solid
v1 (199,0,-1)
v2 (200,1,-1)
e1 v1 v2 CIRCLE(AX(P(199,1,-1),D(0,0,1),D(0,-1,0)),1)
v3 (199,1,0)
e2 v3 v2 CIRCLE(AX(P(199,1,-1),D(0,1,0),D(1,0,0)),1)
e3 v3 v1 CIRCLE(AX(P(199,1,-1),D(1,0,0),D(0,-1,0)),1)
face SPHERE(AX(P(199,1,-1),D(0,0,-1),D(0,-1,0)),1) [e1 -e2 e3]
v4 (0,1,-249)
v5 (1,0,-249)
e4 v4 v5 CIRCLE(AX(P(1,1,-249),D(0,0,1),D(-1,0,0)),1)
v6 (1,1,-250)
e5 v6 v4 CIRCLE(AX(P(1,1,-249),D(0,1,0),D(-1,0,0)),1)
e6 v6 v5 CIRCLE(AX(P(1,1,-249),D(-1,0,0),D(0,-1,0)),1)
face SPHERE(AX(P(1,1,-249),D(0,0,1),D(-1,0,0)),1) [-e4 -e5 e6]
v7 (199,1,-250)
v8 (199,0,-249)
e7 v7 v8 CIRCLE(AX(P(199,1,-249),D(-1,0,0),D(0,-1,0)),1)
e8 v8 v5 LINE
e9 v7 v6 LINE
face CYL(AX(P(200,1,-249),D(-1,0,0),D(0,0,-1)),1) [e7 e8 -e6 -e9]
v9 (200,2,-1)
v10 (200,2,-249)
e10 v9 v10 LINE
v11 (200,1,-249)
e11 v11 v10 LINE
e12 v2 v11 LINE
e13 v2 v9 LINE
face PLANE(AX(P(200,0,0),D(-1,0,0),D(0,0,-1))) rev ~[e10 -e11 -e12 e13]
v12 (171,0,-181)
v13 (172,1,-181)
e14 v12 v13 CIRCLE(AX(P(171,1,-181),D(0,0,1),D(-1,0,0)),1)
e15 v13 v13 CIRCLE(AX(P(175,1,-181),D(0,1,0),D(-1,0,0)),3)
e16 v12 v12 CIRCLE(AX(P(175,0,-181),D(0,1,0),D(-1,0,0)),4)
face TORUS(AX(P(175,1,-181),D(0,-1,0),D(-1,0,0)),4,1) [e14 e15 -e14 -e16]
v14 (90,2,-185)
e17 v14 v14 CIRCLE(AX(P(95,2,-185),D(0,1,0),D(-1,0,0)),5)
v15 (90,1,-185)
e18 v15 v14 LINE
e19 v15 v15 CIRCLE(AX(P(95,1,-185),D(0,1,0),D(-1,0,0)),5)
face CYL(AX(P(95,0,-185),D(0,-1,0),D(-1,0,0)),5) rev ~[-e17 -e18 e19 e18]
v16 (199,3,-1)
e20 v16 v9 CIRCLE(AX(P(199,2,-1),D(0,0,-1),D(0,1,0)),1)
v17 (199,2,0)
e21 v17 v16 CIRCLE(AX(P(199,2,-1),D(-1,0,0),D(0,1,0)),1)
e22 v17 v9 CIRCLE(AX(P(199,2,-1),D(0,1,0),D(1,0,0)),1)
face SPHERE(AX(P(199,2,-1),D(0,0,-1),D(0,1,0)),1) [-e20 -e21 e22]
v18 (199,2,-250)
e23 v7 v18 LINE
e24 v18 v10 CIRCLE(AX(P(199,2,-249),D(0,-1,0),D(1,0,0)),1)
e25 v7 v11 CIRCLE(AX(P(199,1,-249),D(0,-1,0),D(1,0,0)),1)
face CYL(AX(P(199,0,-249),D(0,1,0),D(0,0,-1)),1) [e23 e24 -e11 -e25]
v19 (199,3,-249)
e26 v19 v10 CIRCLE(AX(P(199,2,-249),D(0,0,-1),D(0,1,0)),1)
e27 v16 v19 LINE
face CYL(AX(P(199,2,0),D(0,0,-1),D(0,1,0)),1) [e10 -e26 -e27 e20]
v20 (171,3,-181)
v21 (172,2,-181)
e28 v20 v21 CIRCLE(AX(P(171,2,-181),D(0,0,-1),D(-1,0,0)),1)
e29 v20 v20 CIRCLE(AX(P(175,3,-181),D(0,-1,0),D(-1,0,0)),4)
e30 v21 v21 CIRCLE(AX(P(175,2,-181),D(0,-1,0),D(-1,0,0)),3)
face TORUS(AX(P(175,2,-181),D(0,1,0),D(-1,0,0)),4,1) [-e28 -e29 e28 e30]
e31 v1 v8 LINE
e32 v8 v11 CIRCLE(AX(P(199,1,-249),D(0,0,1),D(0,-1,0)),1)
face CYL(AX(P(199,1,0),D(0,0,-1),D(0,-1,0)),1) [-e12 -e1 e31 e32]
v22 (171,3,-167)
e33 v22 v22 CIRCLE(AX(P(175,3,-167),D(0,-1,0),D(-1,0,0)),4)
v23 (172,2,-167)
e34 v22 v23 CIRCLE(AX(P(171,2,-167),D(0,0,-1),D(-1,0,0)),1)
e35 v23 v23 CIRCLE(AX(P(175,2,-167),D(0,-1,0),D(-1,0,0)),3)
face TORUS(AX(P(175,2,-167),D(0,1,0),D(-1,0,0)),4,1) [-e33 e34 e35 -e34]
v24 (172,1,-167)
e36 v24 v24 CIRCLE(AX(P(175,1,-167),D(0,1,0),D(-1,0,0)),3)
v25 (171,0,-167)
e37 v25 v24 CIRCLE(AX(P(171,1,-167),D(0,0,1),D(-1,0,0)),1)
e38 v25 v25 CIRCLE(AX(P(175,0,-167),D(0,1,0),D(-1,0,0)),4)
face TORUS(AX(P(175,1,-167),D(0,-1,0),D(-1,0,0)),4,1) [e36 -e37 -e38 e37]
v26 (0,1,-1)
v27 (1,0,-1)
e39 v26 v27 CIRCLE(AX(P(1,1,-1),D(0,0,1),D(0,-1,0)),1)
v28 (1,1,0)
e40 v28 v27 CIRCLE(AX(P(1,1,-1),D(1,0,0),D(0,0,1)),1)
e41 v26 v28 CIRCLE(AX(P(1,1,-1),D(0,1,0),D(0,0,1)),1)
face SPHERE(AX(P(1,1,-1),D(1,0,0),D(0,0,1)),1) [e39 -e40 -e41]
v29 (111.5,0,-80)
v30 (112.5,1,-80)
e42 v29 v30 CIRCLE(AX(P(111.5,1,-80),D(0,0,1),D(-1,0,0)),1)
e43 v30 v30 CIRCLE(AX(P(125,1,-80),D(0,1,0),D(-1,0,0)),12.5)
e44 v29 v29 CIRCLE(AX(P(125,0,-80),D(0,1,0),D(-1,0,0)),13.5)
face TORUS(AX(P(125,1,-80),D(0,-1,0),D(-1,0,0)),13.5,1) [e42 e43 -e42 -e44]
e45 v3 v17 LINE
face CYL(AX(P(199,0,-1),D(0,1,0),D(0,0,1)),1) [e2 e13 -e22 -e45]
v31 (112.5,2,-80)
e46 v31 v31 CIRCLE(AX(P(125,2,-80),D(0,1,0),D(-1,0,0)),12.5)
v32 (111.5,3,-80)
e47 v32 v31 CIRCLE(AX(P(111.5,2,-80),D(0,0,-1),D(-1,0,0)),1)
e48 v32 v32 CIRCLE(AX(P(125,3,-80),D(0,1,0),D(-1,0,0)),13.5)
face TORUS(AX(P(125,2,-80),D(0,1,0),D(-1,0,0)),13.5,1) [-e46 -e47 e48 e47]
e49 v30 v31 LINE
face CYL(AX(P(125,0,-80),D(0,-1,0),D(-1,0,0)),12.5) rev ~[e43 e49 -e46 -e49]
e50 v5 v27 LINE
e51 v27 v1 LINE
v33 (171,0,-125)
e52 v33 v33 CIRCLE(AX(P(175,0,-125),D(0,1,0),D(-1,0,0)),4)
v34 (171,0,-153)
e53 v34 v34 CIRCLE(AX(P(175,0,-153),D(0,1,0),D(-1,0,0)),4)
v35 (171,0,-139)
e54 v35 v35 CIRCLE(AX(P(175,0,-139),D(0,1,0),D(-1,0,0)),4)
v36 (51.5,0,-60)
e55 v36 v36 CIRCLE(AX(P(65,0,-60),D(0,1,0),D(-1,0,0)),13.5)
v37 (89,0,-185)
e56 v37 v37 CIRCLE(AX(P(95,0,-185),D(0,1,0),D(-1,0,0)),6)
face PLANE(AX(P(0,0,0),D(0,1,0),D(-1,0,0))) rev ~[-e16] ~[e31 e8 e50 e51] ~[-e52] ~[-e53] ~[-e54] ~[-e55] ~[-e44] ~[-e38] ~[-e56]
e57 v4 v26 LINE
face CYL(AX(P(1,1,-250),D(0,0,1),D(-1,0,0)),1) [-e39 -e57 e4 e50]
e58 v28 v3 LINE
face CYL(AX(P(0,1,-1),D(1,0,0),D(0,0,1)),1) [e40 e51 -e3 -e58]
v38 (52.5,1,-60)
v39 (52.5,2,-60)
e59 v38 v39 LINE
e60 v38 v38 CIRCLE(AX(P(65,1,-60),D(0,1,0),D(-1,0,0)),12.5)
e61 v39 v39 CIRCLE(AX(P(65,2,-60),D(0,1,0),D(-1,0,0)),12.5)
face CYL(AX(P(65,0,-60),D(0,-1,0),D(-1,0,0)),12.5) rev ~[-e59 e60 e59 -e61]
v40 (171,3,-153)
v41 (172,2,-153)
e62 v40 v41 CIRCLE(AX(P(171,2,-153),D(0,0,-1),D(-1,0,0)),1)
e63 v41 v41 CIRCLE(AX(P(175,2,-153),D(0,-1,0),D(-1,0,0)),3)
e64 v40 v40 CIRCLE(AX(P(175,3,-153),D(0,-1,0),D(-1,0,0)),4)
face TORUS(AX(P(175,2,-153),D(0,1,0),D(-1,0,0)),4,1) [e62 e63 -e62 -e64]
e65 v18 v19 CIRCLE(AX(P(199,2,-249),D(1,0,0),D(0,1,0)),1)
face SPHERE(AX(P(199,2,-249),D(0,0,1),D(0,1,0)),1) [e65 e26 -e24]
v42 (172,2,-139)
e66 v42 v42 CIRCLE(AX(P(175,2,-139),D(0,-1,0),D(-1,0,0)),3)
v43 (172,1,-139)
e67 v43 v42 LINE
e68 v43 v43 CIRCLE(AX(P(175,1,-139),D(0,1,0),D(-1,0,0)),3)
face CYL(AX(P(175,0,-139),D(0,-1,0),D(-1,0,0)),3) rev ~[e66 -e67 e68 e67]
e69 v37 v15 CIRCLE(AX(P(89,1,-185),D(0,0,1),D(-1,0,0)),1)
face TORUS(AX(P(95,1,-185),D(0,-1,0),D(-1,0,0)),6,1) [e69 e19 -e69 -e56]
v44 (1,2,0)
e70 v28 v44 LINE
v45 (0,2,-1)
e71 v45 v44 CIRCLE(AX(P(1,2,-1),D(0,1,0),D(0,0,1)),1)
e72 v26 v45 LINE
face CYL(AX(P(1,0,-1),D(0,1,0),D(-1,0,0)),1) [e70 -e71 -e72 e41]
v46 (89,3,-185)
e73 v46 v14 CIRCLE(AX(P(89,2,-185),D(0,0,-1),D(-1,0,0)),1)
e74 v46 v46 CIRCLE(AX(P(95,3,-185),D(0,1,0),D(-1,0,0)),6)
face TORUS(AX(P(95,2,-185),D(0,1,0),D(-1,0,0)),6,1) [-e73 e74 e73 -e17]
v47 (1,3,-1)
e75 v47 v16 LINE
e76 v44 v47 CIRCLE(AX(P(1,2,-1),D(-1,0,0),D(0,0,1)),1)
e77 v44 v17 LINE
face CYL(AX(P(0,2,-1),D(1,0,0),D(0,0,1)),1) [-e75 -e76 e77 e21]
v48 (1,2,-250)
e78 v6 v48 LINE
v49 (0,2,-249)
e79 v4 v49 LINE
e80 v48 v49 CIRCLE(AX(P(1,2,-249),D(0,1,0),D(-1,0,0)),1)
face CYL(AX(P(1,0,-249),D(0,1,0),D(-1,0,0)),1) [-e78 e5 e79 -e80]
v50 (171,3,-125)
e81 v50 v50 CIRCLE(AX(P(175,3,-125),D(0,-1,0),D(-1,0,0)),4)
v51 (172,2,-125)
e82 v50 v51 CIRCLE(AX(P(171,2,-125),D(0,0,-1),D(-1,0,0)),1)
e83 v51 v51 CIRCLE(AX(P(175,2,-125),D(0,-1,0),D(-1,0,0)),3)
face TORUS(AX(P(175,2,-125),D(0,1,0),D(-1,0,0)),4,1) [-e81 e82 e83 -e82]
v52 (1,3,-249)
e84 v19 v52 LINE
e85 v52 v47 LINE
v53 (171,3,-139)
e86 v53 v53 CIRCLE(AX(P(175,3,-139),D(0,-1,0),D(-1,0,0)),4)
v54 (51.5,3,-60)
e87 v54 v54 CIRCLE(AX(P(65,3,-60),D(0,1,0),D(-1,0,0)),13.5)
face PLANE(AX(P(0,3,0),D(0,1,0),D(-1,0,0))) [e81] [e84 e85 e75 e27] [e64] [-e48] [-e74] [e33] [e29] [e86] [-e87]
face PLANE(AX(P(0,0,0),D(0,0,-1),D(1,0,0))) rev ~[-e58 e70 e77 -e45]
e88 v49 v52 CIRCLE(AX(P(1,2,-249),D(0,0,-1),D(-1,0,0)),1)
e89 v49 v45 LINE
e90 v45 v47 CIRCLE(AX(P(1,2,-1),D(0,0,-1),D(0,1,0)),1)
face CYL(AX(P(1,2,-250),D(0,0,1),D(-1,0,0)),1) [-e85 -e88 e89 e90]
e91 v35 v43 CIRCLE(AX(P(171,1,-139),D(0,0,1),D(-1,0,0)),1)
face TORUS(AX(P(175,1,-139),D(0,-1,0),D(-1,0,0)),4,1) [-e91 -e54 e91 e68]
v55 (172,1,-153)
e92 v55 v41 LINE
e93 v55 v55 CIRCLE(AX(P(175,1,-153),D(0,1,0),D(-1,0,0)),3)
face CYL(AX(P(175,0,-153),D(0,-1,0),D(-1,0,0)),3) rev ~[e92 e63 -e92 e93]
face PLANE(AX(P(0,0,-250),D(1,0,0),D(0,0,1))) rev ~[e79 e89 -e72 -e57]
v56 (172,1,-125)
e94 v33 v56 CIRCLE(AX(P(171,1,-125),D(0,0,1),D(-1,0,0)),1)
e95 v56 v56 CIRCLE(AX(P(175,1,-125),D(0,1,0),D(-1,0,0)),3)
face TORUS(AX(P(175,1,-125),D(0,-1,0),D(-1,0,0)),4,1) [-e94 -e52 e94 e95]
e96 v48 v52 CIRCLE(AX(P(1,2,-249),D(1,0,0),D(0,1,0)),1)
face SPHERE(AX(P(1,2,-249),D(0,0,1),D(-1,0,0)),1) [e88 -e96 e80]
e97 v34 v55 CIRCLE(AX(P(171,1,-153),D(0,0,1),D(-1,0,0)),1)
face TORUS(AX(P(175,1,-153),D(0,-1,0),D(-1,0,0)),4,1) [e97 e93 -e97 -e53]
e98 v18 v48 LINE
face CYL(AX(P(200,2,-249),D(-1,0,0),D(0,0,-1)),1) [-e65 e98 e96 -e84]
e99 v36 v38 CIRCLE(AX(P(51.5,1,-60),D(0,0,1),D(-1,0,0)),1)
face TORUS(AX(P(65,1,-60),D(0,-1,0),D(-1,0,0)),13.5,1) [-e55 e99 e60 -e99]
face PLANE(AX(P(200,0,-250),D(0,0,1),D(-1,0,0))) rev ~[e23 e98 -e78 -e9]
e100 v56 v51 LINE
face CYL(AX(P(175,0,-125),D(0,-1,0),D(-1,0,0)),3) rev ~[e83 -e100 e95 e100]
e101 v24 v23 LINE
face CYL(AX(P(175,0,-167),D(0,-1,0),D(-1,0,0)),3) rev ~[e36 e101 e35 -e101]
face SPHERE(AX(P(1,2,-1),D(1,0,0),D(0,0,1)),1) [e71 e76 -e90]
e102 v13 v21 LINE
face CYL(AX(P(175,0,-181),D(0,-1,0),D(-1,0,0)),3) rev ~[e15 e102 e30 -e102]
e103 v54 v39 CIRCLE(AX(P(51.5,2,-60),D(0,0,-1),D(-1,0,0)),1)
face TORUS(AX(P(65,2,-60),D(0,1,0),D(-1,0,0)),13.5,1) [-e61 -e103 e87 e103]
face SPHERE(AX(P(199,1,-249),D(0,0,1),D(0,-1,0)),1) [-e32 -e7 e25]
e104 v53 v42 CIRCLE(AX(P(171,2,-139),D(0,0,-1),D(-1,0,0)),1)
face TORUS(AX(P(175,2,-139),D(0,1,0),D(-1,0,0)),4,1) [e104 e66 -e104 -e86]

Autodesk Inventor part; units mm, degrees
ref_plane "YZ Plane" through (0, 0, 0) normal (1, 0, 0) x (0, 1, 0)
ref_plane "XZ Plane" through (0, 0, 0) normal (0, 1, 0) x (-1, 0, 0)
ref_plane "XY Plane" through (0, 0, 0) normal (0, 0, 1) x (1, 0, 0)
sketch "page_lines" plane through (0, 0, 0) normal (0, 1, 0) x (-1, 0, 0)
  line L0 (0, 0) -> (-200, 0)
  line L1 (-200, 0) -> (-200, -250)
  line L2 (-200, -250) -> (0, -250)
  line L3 (0, -250) -> (0, 0)
  circle A0 centre (-65, -60) radius 6
  circle A1 centre (-125, -80) radius 6
  circle A2 centre (-65, -60) radius 12.5
  circle A3 centre (-65, -60) radius 8.5
  circle A4 centre (-125, -80) radius 8.5
  circle A5 centre (-125, -80) radius 12.5
  circle A6 centre (-175, -125) radius 3
  line L4 (-175, -125) -> (-175, -209)
  line L5 (-175, -125) -> (-91, -125) construction
  circle A7 centre (-175, -139) radius 3
  circle A8 centre (-175, -153) radius 3
  circle A9 centre (-175, -167) radius 3
  circle A10 centre (-175, -181) radius 3
  circle A11 centre (-175, -195) radius 3
  circle A12 centre (-175, -209) radius 3
  circle A13 centre (-95, -185) radius 2.5
  circle A14 centre (-95, -185) radius 5
  point P0 (-200, -125)
  dimension "d0" = 200
  dimension "d1" = 250
  dimension "d2" = 12
  dimension "d3" = 12
  dimension "d4" = 25
  dimension "d5" = 17
  dimension "d6" = 17
  dimension "d7" = 25
  dimension "d8" = 75
  dimension "d9" = 80
  dimension "d10" = 65
  dimension "d11" = 60
  dimension "d12" = 6
  dimension "d13" = 84
  dimension "d14" = 90
  dimension "d15" = 25
  dimension "d16" = 125
  dimension "d19" = 14
  dimension "d24" = 5
  dimension "d25" = 10
  dimension "d26" = 65
  dimension "d27" = 95
extrude "nor" add sketch "page_lines" along normal blind 3 contours L3 L2 L1 L0 | A11 L4 | L4 A11 | A12
fillet "Fillet1" radius 1 28 edges at (77.5, 3, -60) (77.5, 0, -60) (100, 3, -185) (100, 0, -185) (178, 3, -125) (178, 0, -125) (200, 3, -125) (200, 0, -125) (100, 0, 0) (100, 3, 0) (200, 1.5, 0) (0, 1.5, 0) (0, 3, -125) (0, 0, -125) (0, 1.5, -250) (100, 3, -250) (100, 0, -250) (200, 1.5, -250) (178, 3, -139) (178, 0, -139) (137.5, 3, -80) (137.5, 0, -80) (178, 3, -153) (178, 0, -153) (178, 3, -167) (178, 0, -167) (178, 3, -181) (178, 0, -181)
properties part number "pages_nor"
